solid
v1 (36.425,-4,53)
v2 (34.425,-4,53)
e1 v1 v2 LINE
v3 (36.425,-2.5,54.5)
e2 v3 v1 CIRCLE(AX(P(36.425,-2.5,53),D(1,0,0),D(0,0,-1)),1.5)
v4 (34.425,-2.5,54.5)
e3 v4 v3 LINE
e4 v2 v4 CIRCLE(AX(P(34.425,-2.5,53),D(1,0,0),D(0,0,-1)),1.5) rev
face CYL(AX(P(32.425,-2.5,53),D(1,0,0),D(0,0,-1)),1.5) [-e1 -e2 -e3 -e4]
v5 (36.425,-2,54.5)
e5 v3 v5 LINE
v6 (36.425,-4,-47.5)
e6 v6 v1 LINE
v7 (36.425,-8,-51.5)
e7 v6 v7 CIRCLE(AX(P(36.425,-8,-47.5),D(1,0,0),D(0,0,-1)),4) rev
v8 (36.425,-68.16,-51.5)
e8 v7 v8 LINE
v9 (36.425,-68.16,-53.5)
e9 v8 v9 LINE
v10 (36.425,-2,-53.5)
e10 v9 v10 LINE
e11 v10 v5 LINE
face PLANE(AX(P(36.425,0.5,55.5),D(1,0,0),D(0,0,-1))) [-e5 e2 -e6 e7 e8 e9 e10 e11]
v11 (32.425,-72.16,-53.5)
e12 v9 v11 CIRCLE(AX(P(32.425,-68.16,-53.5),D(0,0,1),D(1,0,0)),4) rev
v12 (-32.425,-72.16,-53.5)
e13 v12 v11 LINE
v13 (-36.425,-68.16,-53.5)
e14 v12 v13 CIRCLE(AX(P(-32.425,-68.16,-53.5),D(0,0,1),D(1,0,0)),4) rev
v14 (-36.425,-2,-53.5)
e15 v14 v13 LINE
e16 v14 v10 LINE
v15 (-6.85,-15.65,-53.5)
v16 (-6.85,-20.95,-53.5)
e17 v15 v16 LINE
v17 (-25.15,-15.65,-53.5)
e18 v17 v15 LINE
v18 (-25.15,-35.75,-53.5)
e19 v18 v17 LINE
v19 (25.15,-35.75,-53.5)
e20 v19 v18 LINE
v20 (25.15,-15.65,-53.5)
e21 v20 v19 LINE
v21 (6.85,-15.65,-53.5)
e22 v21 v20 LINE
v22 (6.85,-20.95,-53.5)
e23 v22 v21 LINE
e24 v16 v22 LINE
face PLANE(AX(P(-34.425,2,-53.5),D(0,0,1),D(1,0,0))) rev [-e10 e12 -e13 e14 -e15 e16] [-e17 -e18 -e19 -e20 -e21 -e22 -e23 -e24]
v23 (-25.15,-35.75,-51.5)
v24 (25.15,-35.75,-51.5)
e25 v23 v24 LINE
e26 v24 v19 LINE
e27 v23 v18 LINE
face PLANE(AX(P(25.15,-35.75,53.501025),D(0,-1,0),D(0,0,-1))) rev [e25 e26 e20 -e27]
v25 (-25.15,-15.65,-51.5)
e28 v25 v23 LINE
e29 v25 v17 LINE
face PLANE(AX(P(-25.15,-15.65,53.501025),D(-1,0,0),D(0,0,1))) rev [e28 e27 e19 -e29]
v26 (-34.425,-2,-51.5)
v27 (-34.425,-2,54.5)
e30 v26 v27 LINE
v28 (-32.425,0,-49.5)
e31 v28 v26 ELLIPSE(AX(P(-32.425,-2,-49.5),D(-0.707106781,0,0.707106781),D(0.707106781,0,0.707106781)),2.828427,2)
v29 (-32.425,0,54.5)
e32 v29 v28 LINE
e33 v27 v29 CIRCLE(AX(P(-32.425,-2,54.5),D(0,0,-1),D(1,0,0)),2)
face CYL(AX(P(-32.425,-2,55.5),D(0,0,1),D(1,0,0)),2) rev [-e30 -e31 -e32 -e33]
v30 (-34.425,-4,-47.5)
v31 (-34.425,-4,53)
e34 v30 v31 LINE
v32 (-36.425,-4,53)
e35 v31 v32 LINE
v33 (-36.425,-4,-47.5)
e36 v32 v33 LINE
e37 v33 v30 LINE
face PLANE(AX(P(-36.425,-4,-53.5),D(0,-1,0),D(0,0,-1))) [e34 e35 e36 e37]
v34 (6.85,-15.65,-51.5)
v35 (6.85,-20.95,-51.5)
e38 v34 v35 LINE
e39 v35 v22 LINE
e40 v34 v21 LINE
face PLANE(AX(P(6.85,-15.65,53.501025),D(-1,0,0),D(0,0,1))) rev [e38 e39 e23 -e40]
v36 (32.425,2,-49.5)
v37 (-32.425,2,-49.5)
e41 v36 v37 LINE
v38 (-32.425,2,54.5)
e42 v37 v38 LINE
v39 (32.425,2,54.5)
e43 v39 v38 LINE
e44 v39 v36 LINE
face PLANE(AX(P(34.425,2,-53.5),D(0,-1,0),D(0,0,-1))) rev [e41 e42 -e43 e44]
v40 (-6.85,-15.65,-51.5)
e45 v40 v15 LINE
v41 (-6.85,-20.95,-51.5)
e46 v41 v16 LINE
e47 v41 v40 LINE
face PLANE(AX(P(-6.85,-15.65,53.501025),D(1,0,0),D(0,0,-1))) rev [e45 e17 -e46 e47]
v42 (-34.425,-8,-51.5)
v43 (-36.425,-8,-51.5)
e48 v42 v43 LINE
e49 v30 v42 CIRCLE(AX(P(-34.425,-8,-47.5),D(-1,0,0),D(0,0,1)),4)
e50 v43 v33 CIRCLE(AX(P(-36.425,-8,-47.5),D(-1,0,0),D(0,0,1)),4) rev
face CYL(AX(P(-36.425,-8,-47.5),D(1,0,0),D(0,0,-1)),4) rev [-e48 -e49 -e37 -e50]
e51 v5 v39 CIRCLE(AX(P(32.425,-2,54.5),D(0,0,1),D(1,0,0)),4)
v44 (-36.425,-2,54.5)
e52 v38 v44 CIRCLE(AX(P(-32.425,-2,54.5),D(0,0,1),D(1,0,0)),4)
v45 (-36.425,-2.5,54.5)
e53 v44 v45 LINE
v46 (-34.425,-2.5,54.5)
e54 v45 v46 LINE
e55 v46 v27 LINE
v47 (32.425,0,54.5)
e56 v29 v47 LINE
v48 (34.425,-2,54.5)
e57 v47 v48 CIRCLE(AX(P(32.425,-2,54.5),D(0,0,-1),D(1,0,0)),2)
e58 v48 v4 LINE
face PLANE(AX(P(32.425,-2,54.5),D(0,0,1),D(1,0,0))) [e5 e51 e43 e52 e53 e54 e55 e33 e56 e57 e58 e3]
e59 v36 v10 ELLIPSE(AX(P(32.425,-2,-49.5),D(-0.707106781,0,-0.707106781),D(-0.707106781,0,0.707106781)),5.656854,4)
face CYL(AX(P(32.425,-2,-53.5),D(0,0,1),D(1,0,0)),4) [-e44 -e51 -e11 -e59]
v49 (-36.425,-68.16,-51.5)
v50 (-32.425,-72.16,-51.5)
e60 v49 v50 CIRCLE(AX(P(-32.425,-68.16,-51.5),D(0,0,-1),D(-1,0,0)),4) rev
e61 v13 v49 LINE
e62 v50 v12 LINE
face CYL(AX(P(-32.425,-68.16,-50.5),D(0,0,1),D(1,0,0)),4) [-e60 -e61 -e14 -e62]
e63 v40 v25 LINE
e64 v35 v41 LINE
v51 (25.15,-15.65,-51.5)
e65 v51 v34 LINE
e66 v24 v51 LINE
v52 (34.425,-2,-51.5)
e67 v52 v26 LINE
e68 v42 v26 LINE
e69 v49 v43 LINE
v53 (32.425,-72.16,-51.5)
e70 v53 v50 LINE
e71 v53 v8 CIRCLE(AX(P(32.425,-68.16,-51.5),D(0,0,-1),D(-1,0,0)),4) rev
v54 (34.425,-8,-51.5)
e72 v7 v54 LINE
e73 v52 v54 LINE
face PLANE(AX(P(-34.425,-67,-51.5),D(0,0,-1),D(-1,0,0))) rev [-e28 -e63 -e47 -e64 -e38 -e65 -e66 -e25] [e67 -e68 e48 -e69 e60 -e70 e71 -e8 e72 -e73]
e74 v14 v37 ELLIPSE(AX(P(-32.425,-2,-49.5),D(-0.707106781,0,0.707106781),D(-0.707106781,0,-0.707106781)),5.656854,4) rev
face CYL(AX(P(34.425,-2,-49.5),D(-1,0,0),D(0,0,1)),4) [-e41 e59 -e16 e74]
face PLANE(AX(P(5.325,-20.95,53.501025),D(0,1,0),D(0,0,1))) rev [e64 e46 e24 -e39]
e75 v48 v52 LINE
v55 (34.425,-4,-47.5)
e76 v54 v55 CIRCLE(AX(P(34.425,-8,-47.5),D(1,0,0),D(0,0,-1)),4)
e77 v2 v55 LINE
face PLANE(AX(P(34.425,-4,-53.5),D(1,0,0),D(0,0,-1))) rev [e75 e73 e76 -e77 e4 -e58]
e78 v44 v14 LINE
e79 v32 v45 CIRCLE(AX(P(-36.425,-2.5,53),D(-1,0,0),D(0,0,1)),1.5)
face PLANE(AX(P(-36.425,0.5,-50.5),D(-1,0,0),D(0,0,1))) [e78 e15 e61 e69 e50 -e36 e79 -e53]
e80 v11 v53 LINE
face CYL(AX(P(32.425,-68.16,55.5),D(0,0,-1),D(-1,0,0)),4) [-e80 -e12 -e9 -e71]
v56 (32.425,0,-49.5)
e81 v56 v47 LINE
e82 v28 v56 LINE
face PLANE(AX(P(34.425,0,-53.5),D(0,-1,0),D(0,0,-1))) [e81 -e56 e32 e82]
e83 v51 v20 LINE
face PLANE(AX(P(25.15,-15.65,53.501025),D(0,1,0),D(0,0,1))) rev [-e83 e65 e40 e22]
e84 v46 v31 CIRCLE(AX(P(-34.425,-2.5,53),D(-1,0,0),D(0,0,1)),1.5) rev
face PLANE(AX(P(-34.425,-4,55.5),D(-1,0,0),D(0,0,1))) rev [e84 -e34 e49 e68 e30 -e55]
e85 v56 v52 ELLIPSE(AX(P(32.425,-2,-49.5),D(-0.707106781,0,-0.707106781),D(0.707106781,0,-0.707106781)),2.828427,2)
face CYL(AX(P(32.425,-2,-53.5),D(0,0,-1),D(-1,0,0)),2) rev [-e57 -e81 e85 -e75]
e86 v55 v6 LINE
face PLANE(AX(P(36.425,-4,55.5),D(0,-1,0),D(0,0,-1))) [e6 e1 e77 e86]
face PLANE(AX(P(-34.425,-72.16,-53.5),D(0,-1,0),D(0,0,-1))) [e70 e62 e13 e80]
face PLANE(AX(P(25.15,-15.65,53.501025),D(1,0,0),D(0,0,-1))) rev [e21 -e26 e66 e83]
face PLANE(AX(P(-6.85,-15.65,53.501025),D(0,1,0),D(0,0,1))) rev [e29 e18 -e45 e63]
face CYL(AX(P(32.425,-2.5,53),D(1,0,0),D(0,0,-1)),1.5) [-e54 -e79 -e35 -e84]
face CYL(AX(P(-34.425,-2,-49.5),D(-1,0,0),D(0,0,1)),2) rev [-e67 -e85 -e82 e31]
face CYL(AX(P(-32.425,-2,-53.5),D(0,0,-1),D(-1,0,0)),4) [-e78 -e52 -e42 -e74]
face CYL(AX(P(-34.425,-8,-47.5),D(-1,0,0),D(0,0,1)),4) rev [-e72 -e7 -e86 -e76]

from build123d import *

# Parameters (mm, degrees)
SKETCH1_W            = 68.85
SKETCH1_H            = 107
BOSS_EXTRUDE1_DEPTH  = 2
SKETCH2_W            = 68.85
SKETCH2_H            = 2
BOSS_EXTRUDE2_DEPTH  = 67
CUT_EXTRUDE2_REACH   = 132.855
SKETCH5_W            = 68.85
SKETCH5_H            = 2
BOSS_EXTRUDE3_DEPTH  = 51
SKETCH6_W            = 68.85
SKETCH6_H            = 2
BOSS_EXTRUDE4_DEPTH  = 20.36
BOSS_EXTRUDE5_DEPTH  = 1.5
SKETCH13_W           = 2
SKETCH13_H           = 1.5
BOSS_EXTRUDE8_DEPTH  = 3
CUT_EXTRUDE4_REACH   = 97.75
SKETCH9_R            = 1.75
FILLET1_R            = 1.5
FILLET2_R            = 3
FILLET3_R            = 1.5
FILLET4_R            = 3
CUT_EXTRUDE5_REACH   = 111.975
SKETCH10_R           = 1.75
CHAMFER1_SIZE        = 2
SKETCH11_W           = 2
SKETCH11_H           = 109
BOSS_EXTRUDE6_DEPTH  = 4.5
SKETCH14_W           = 68.85
SKETCH14_H           = 0.5
BOSS_EXTRUDE9_DEPTH  = 2
FILLET5_R            = 2
FILLET6_R            = 4
FILLET8_R            = 4
CUT_EXTRUDE6_DEPTH   = 1
CUT_EXTRUDE7_DEPTH   = 125.986967721
SKETCH17_W           = 68.85
SKETCH17_H           = 2
BOSS_EXTRUDE10_DEPTH = 8.66
SKETCH18_W           = 2
SKETCH18_H           = 68.16
BOSS_EXTRUDE11_DEPTH = 2
SKETCH19_W           = 2
SKETCH19_H           = 68.16
BOSS_EXTRUDE12_DEPTH = 2
FILLET9_R            = 4
FILLET10_R           = 4
FILLET11_R           = 1.5


with BuildPart() as part:
    # Sketch1 → Boss-Extrude1 (new body)
    with BuildSketch(Plane(origin=(0, 0, 0), x_dir=(1, 0, 0), z_dir=(0, 1, 0))):
        Rectangle(SKETCH1_W, SKETCH1_H)
    extrude(amount=BOSS_EXTRUDE1_DEPTH)

    # Sketch2 → Boss-Extrude2 (add)
    with BuildSketch(Plane.XZ):
        with Locations((0, -52.5)):
            Rectangle(SKETCH2_W, SKETCH2_H)
    extrude(amount=BOSS_EXTRUDE2_DEPTH)

    # Sketch4 → Cut-Extrude2 (cut, up to next)
    with BuildSketch(Plane(origin=(0, 0, -53.5), x_dir=(-1, 0, 0), z_dir=(0, 0, -1)), mode=Mode.PRIVATE) as cut_extrude2_sk1:
        Polygon((-6.85, -15.65), (-6.85, -20.95), (-5.325, -20.95), (6.85, -20.95), (6.85, -15.65), (25.15, -15.65), (25.15, -35.75), (-25.15, -35.75), (-25.15, -15.65), align=None)
    cut_extrude2_tool1 = extrude(cut_extrude2_sk1.sketch, amount=-CUT_EXTRUDE2_REACH, mode=Mode.PRIVATE) & part.part
    add(cut_extrude2_tool1.solids().sort_by_distance((0, -26.272573, -53.5))[0], mode=Mode.SUBTRACT)

    # Sketch5 → Boss-Extrude3 (add)
    with BuildSketch(Plane.XY.offset(-51.5)):
        with Locations((0, -66)):
            Rectangle(SKETCH5_W, SKETCH5_H)
    extrude(amount=BOSS_EXTRUDE3_DEPTH)

    # Sketch6 → Boss-Extrude4 (add)
    with BuildSketch(Plane.XZ.offset(67)):
        with Locations((0, -1.5)):
            Rectangle(SKETCH6_W, SKETCH6_H)
    extrude(amount=BOSS_EXTRUDE4_DEPTH)

    # Sketch8 → Boss-Extrude5 (add)
    with BuildSketch(Plane(origin=(0, 2, 0), x_dir=(1, 0, 0), z_dir=(0, 1, 0))):
        Polygon((-36.425, 50.5), (-34.425, 50.5), (-34.425, -53.5), (34.425, -53.5), (34.425, 50.5), (36.425, 50.5), (36.425, -55.5), (-36.425, -55.5), align=None)
    extrude(amount=-BOSS_EXTRUDE5_DEPTH)

    # Sketch13 → Boss-Extrude8 (add)
    with BuildSketch(Plane(origin=(0, 0, -50.5), x_dir=(-1, 0, 0), z_dir=(0, 0, -1))):
        with Locations((35.425, 1.25)):
            Rectangle(SKETCH13_W, SKETCH13_H)
        with Locations((-35.425, 1.25)):
            Rectangle(SKETCH13_W, SKETCH13_H)
    extrude(amount=BOSS_EXTRUDE8_DEPTH)

    # Sketch9 → Cut-Extrude4 (cut, up to next)
    with BuildSketch(Plane.XZ.offset(67), mode=Mode.PRIVATE) as cut_extrude4_sk1:
        with Locations(Location((-25, -23.48, 0), (0, 0, 270))):
            Circle(SKETCH9_R)
    cut_extrude4_tool1 = extrude(cut_extrude4_sk1.sketch, amount=-CUT_EXTRUDE4_REACH, mode=Mode.PRIVATE) & part.part
    # Sketch9 → Cut-Extrude4 (cut, up to next)
    with BuildSketch(Plane.XZ.offset(67), mode=Mode.PRIVATE) as cut_extrude4_sk2:
        with Locations(Location((25, -23.48, 0), (0, 0, 270))):
            Circle(SKETCH9_R)
    cut_extrude4_tool2 = extrude(cut_extrude4_sk2.sketch, amount=-CUT_EXTRUDE4_REACH, mode=Mode.PRIVATE) & part.part
    add(cut_extrude4_tool1.solids().sort_by_distance((-25, -67, -23.48))[0], mode=Mode.SUBTRACT)
    add(cut_extrude4_tool2.solids().sort_by_distance((25, -67, -23.48))[0], mode=Mode.SUBTRACT)

    # Fillet1
    fillet1_edges = [part.edges().sort_by_distance(p)[0] for p in [
        (0, -67, -2.5),
    ]]
    fillet(fillet1_edges, radius=FILLET1_R)

    # Fillet2
    fillet2_edges = [part.edges().sort_by_distance(p)[0] for p in [
        (0, -65, -0.5),
    ]]
    fillet(fillet2_edges, radius=FILLET2_R)

    # Fillet3
    fillet3_edges = [part.edges().sort_by_distance(p)[0] for p in [
        (0, -65, -51.5),
    ]]
    fillet(fillet3_edges, radius=FILLET3_R)

    # Fillet4
    fillet4_edges = [part.edges().sort_by_distance(p)[0] for p in [
        (0, -67, -53.5),
    ]]
    fillet(fillet4_edges, radius=FILLET4_R)

    # Sketch10 → Cut-Extrude5 (cut, up to next)
    with BuildSketch(Plane.XY.offset(-0.5), mode=Mode.PRIVATE) as cut_extrude5_sk1:
        with Locations((-24.425, -79.36)):
            Circle(SKETCH10_R)
    cut_extrude5_tool1 = extrude(cut_extrude5_sk1.sketch, amount=-CUT_EXTRUDE5_REACH, mode=Mode.PRIVATE) & part.part
    # Sketch10 → Cut-Extrude5 (cut, up to next)
    with BuildSketch(Plane.XY.offset(-0.5), mode=Mode.PRIVATE) as cut_extrude5_sk2:
        with Locations((24.425, -79.36)):
            Circle(SKETCH10_R)
    cut_extrude5_tool2 = extrude(cut_extrude5_sk2.sketch, amount=-CUT_EXTRUDE5_REACH, mode=Mode.PRIVATE) & part.part
    add(cut_extrude5_tool1.solids().sort_by_distance((-24.425, -79.36, -0.5))[0], mode=Mode.SUBTRACT)
    add(cut_extrude5_tool2.solids().sort_by_distance((24.425, -79.36, -0.5))[0], mode=Mode.SUBTRACT)

    # Chamfer1
    chamfer1_edges = [part.edges().sort_by_distance(p)[0] for p in [
        (-34.425, -87.36, -1.5),
        (34.425, -87.36, -1.5),
    ]]
    chamfer(chamfer1_edges, length=CHAMFER1_SIZE)

    # Sketch11 → Boss-Extrude6 (add)
    with BuildSketch(Plane.XZ.offset(-0.5)):
        with Locations((35.425, 1)):
            Rectangle(SKETCH11_W, SKETCH11_H)
        with Locations((-35.425, 1)):
            Rectangle(SKETCH11_W, SKETCH11_H)
    extrude(amount=BOSS_EXTRUDE6_DEPTH)

    # Sketch14 → Boss-Extrude9 (add)
    with BuildSketch(Plane.XY.offset(53.5)):
        with Locations((0, 0.25)):
            Rectangle(SKETCH14_W, SKETCH14_H)
    extrude(amount=BOSS_EXTRUDE9_DEPTH)

    # Fillet5
    fillet5_edges = [part.edges().sort_by_distance(p)[0] for p in [
        (0, 0, -51.5),
        (34.425, 0, 2),
        (-34.425, 0, 2),
    ]]
    fillet(fillet5_edges, radius=FILLET5_R)

    # Fillet6
    fillet6_edges = [part.edges().sort_by_distance(p)[0] for p in [
        (0, 2, -53.5),
    ]]
    fillet(fillet6_edges, radius=FILLET6_R)

    # Fillet8
    # the kernel refuses this fillet: 4 mm, written as the material it takes off along each edge
    with BuildSketch(Plane(origin=(-36.425, 2, 65.5), x_dir=(1, 0, 0), z_dir=(0, 0, -1))) as fillet8_piece_1:
        with BuildLine():
            CenterArc((FILLET8_R, FILLET8_R), FILLET8_R, 180, 90)
            Line((0, FILLET8_R), (0, 0))
            Line((0, 0), (FILLET8_R, 0))
        make_face()
    extrude(amount=125, mode=Mode.SUBTRACT)
    with BuildSketch(Plane(origin=(36.425, 2, -59.5), x_dir=(0, -1, 0), z_dir=(0, 0, 1))) as fillet8_piece_2:
        with BuildLine():
            CenterArc((FILLET8_R, -FILLET8_R), FILLET8_R, 90, 90)
            Line((0, -FILLET8_R), (0, 0))
            Line((0, 0), (FILLET8_R, 0))
        make_face()
    extrude(amount=125, mode=Mode.SUBTRACT)

    # Sketch15 → Cut-Extrude6 (cut)
    with BuildSketch(Plane.XY.offset(55.5)):
        with BuildLine():
            Line((-36.425, -2), (-36.425, -4))
            Line((-36.425, -4), (-34.425, -4))
            Line((-34.425, -4), (-34.425, -2))
            ThreePointArc((-34.425, -2), (-33.839213562, -0.585786438), (-32.425, 0))
            Line((-32.425, 0), (32.425, 0))
            ThreePointArc((32.425, 0), (33.839213562, -0.585786438), (34.425, -2))
            Line((34.425, -2), (34.425, -4))
            Line((34.425, -4), (36.425, -4))
            Line((36.425, -4), (36.425, -2))
            ThreePointArc((36.425, -2), (35.253427125, 0.828427125), (32.425, 2))
            Line((32.425, 2), (-32.425, 2))
            ThreePointArc((-32.425, 2), (-35.253427125, 0.828427125), (-36.425, -2))
        make_face()
    extrude(amount=-CUT_EXTRUDE6_DEPTH, mode=Mode.SUBTRACT)

    # Sketch16 → Cut-Extrude7 (cut, through all)
    with BuildSketch(Plane(origin=(34.425, 0, 0), x_dir=(0, 0, -1), z_dir=(1, 0, 0))):
        with BuildLine():
            Line((2.5, -87.36), (0.5, -87.36))
            Line((0.5, -87.36), (0.5, -68))
            ThreePointArc((0.5, -68), (1.378679656, -65.878679656), (3.5, -65))
            Line((3.5, -65), (50, -65))
            ThreePointArc((50, -65), (51.060660172, -64.560660172), (51.5, -63.5))
            Line((51.5, -63.5), (53.5, -63.5))
            Line((53.5, -63.5), (53.5, -64))
            ThreePointArc((53.5, -64), (52.621320344, -66.121320344), (50.5, -67))
            Line((50.5, -67), (4, -67))
            ThreePointArc((4, -67), (2.939339828, -67.439339828), (2.5, -68.5))
            Line((2.5, -68.5), (2.5, -87.36))
        make_face()
    extrude(amount=-CUT_EXTRUDE7_DEPTH, mode=Mode.SUBTRACT)

    # Sketch17 → Boss-Extrude10 (add)
    with BuildSketch(Plane.XZ.offset(63.5)):
        with Locations((0, -52.5)):
            Rectangle(SKETCH17_W, SKETCH17_H)
    extrude(amount=BOSS_EXTRUDE10_DEPTH)

    # Sketch18 → Boss-Extrude11 (add)
    with BuildSketch(Plane(origin=(34.425, 0, 0), x_dir=(0, 0, -1), z_dir=(1, 0, 0))):
        with Locations((52.5, -38.08)):
            Rectangle(SKETCH18_W, SKETCH18_H)
    extrude(amount=BOSS_EXTRUDE11_DEPTH)

    # Sketch19 → Boss-Extrude12 (add)
    with BuildSketch(Plane.ZY.offset(34.425)):
        with Locations((-52.5, -38.08)):
            Rectangle(SKETCH19_W, SKETCH19_H)
    extrude(amount=BOSS_EXTRUDE12_DEPTH)

    # Fillet9
    fillet9_edges = [part.edges().sort_by_distance(p)[0] for p in [
        (36.425, -72.16, -52.5),
        (-36.425, -72.16, -52.5),
    ]]
    fillet(fillet9_edges, radius=FILLET9_R)

    # Fillet10
    fillet10_edges = [part.edges().sort_by_distance(p)[0] for p in [
        (35.425, -4, -51.5),
        (-35.425, -4, -51.5),
    ]]
    fillet(fillet10_edges, radius=FILLET10_R)

    # Fillet11
    fillet11_edges = [part.edges().sort_by_distance(p)[0] for p in [
        (35.425, -4, 54.5),
        (-35.425, -4, 54.5),
    ]]
    fillet(fillet11_edges, radius=FILLET11_R)


solid = part.part
